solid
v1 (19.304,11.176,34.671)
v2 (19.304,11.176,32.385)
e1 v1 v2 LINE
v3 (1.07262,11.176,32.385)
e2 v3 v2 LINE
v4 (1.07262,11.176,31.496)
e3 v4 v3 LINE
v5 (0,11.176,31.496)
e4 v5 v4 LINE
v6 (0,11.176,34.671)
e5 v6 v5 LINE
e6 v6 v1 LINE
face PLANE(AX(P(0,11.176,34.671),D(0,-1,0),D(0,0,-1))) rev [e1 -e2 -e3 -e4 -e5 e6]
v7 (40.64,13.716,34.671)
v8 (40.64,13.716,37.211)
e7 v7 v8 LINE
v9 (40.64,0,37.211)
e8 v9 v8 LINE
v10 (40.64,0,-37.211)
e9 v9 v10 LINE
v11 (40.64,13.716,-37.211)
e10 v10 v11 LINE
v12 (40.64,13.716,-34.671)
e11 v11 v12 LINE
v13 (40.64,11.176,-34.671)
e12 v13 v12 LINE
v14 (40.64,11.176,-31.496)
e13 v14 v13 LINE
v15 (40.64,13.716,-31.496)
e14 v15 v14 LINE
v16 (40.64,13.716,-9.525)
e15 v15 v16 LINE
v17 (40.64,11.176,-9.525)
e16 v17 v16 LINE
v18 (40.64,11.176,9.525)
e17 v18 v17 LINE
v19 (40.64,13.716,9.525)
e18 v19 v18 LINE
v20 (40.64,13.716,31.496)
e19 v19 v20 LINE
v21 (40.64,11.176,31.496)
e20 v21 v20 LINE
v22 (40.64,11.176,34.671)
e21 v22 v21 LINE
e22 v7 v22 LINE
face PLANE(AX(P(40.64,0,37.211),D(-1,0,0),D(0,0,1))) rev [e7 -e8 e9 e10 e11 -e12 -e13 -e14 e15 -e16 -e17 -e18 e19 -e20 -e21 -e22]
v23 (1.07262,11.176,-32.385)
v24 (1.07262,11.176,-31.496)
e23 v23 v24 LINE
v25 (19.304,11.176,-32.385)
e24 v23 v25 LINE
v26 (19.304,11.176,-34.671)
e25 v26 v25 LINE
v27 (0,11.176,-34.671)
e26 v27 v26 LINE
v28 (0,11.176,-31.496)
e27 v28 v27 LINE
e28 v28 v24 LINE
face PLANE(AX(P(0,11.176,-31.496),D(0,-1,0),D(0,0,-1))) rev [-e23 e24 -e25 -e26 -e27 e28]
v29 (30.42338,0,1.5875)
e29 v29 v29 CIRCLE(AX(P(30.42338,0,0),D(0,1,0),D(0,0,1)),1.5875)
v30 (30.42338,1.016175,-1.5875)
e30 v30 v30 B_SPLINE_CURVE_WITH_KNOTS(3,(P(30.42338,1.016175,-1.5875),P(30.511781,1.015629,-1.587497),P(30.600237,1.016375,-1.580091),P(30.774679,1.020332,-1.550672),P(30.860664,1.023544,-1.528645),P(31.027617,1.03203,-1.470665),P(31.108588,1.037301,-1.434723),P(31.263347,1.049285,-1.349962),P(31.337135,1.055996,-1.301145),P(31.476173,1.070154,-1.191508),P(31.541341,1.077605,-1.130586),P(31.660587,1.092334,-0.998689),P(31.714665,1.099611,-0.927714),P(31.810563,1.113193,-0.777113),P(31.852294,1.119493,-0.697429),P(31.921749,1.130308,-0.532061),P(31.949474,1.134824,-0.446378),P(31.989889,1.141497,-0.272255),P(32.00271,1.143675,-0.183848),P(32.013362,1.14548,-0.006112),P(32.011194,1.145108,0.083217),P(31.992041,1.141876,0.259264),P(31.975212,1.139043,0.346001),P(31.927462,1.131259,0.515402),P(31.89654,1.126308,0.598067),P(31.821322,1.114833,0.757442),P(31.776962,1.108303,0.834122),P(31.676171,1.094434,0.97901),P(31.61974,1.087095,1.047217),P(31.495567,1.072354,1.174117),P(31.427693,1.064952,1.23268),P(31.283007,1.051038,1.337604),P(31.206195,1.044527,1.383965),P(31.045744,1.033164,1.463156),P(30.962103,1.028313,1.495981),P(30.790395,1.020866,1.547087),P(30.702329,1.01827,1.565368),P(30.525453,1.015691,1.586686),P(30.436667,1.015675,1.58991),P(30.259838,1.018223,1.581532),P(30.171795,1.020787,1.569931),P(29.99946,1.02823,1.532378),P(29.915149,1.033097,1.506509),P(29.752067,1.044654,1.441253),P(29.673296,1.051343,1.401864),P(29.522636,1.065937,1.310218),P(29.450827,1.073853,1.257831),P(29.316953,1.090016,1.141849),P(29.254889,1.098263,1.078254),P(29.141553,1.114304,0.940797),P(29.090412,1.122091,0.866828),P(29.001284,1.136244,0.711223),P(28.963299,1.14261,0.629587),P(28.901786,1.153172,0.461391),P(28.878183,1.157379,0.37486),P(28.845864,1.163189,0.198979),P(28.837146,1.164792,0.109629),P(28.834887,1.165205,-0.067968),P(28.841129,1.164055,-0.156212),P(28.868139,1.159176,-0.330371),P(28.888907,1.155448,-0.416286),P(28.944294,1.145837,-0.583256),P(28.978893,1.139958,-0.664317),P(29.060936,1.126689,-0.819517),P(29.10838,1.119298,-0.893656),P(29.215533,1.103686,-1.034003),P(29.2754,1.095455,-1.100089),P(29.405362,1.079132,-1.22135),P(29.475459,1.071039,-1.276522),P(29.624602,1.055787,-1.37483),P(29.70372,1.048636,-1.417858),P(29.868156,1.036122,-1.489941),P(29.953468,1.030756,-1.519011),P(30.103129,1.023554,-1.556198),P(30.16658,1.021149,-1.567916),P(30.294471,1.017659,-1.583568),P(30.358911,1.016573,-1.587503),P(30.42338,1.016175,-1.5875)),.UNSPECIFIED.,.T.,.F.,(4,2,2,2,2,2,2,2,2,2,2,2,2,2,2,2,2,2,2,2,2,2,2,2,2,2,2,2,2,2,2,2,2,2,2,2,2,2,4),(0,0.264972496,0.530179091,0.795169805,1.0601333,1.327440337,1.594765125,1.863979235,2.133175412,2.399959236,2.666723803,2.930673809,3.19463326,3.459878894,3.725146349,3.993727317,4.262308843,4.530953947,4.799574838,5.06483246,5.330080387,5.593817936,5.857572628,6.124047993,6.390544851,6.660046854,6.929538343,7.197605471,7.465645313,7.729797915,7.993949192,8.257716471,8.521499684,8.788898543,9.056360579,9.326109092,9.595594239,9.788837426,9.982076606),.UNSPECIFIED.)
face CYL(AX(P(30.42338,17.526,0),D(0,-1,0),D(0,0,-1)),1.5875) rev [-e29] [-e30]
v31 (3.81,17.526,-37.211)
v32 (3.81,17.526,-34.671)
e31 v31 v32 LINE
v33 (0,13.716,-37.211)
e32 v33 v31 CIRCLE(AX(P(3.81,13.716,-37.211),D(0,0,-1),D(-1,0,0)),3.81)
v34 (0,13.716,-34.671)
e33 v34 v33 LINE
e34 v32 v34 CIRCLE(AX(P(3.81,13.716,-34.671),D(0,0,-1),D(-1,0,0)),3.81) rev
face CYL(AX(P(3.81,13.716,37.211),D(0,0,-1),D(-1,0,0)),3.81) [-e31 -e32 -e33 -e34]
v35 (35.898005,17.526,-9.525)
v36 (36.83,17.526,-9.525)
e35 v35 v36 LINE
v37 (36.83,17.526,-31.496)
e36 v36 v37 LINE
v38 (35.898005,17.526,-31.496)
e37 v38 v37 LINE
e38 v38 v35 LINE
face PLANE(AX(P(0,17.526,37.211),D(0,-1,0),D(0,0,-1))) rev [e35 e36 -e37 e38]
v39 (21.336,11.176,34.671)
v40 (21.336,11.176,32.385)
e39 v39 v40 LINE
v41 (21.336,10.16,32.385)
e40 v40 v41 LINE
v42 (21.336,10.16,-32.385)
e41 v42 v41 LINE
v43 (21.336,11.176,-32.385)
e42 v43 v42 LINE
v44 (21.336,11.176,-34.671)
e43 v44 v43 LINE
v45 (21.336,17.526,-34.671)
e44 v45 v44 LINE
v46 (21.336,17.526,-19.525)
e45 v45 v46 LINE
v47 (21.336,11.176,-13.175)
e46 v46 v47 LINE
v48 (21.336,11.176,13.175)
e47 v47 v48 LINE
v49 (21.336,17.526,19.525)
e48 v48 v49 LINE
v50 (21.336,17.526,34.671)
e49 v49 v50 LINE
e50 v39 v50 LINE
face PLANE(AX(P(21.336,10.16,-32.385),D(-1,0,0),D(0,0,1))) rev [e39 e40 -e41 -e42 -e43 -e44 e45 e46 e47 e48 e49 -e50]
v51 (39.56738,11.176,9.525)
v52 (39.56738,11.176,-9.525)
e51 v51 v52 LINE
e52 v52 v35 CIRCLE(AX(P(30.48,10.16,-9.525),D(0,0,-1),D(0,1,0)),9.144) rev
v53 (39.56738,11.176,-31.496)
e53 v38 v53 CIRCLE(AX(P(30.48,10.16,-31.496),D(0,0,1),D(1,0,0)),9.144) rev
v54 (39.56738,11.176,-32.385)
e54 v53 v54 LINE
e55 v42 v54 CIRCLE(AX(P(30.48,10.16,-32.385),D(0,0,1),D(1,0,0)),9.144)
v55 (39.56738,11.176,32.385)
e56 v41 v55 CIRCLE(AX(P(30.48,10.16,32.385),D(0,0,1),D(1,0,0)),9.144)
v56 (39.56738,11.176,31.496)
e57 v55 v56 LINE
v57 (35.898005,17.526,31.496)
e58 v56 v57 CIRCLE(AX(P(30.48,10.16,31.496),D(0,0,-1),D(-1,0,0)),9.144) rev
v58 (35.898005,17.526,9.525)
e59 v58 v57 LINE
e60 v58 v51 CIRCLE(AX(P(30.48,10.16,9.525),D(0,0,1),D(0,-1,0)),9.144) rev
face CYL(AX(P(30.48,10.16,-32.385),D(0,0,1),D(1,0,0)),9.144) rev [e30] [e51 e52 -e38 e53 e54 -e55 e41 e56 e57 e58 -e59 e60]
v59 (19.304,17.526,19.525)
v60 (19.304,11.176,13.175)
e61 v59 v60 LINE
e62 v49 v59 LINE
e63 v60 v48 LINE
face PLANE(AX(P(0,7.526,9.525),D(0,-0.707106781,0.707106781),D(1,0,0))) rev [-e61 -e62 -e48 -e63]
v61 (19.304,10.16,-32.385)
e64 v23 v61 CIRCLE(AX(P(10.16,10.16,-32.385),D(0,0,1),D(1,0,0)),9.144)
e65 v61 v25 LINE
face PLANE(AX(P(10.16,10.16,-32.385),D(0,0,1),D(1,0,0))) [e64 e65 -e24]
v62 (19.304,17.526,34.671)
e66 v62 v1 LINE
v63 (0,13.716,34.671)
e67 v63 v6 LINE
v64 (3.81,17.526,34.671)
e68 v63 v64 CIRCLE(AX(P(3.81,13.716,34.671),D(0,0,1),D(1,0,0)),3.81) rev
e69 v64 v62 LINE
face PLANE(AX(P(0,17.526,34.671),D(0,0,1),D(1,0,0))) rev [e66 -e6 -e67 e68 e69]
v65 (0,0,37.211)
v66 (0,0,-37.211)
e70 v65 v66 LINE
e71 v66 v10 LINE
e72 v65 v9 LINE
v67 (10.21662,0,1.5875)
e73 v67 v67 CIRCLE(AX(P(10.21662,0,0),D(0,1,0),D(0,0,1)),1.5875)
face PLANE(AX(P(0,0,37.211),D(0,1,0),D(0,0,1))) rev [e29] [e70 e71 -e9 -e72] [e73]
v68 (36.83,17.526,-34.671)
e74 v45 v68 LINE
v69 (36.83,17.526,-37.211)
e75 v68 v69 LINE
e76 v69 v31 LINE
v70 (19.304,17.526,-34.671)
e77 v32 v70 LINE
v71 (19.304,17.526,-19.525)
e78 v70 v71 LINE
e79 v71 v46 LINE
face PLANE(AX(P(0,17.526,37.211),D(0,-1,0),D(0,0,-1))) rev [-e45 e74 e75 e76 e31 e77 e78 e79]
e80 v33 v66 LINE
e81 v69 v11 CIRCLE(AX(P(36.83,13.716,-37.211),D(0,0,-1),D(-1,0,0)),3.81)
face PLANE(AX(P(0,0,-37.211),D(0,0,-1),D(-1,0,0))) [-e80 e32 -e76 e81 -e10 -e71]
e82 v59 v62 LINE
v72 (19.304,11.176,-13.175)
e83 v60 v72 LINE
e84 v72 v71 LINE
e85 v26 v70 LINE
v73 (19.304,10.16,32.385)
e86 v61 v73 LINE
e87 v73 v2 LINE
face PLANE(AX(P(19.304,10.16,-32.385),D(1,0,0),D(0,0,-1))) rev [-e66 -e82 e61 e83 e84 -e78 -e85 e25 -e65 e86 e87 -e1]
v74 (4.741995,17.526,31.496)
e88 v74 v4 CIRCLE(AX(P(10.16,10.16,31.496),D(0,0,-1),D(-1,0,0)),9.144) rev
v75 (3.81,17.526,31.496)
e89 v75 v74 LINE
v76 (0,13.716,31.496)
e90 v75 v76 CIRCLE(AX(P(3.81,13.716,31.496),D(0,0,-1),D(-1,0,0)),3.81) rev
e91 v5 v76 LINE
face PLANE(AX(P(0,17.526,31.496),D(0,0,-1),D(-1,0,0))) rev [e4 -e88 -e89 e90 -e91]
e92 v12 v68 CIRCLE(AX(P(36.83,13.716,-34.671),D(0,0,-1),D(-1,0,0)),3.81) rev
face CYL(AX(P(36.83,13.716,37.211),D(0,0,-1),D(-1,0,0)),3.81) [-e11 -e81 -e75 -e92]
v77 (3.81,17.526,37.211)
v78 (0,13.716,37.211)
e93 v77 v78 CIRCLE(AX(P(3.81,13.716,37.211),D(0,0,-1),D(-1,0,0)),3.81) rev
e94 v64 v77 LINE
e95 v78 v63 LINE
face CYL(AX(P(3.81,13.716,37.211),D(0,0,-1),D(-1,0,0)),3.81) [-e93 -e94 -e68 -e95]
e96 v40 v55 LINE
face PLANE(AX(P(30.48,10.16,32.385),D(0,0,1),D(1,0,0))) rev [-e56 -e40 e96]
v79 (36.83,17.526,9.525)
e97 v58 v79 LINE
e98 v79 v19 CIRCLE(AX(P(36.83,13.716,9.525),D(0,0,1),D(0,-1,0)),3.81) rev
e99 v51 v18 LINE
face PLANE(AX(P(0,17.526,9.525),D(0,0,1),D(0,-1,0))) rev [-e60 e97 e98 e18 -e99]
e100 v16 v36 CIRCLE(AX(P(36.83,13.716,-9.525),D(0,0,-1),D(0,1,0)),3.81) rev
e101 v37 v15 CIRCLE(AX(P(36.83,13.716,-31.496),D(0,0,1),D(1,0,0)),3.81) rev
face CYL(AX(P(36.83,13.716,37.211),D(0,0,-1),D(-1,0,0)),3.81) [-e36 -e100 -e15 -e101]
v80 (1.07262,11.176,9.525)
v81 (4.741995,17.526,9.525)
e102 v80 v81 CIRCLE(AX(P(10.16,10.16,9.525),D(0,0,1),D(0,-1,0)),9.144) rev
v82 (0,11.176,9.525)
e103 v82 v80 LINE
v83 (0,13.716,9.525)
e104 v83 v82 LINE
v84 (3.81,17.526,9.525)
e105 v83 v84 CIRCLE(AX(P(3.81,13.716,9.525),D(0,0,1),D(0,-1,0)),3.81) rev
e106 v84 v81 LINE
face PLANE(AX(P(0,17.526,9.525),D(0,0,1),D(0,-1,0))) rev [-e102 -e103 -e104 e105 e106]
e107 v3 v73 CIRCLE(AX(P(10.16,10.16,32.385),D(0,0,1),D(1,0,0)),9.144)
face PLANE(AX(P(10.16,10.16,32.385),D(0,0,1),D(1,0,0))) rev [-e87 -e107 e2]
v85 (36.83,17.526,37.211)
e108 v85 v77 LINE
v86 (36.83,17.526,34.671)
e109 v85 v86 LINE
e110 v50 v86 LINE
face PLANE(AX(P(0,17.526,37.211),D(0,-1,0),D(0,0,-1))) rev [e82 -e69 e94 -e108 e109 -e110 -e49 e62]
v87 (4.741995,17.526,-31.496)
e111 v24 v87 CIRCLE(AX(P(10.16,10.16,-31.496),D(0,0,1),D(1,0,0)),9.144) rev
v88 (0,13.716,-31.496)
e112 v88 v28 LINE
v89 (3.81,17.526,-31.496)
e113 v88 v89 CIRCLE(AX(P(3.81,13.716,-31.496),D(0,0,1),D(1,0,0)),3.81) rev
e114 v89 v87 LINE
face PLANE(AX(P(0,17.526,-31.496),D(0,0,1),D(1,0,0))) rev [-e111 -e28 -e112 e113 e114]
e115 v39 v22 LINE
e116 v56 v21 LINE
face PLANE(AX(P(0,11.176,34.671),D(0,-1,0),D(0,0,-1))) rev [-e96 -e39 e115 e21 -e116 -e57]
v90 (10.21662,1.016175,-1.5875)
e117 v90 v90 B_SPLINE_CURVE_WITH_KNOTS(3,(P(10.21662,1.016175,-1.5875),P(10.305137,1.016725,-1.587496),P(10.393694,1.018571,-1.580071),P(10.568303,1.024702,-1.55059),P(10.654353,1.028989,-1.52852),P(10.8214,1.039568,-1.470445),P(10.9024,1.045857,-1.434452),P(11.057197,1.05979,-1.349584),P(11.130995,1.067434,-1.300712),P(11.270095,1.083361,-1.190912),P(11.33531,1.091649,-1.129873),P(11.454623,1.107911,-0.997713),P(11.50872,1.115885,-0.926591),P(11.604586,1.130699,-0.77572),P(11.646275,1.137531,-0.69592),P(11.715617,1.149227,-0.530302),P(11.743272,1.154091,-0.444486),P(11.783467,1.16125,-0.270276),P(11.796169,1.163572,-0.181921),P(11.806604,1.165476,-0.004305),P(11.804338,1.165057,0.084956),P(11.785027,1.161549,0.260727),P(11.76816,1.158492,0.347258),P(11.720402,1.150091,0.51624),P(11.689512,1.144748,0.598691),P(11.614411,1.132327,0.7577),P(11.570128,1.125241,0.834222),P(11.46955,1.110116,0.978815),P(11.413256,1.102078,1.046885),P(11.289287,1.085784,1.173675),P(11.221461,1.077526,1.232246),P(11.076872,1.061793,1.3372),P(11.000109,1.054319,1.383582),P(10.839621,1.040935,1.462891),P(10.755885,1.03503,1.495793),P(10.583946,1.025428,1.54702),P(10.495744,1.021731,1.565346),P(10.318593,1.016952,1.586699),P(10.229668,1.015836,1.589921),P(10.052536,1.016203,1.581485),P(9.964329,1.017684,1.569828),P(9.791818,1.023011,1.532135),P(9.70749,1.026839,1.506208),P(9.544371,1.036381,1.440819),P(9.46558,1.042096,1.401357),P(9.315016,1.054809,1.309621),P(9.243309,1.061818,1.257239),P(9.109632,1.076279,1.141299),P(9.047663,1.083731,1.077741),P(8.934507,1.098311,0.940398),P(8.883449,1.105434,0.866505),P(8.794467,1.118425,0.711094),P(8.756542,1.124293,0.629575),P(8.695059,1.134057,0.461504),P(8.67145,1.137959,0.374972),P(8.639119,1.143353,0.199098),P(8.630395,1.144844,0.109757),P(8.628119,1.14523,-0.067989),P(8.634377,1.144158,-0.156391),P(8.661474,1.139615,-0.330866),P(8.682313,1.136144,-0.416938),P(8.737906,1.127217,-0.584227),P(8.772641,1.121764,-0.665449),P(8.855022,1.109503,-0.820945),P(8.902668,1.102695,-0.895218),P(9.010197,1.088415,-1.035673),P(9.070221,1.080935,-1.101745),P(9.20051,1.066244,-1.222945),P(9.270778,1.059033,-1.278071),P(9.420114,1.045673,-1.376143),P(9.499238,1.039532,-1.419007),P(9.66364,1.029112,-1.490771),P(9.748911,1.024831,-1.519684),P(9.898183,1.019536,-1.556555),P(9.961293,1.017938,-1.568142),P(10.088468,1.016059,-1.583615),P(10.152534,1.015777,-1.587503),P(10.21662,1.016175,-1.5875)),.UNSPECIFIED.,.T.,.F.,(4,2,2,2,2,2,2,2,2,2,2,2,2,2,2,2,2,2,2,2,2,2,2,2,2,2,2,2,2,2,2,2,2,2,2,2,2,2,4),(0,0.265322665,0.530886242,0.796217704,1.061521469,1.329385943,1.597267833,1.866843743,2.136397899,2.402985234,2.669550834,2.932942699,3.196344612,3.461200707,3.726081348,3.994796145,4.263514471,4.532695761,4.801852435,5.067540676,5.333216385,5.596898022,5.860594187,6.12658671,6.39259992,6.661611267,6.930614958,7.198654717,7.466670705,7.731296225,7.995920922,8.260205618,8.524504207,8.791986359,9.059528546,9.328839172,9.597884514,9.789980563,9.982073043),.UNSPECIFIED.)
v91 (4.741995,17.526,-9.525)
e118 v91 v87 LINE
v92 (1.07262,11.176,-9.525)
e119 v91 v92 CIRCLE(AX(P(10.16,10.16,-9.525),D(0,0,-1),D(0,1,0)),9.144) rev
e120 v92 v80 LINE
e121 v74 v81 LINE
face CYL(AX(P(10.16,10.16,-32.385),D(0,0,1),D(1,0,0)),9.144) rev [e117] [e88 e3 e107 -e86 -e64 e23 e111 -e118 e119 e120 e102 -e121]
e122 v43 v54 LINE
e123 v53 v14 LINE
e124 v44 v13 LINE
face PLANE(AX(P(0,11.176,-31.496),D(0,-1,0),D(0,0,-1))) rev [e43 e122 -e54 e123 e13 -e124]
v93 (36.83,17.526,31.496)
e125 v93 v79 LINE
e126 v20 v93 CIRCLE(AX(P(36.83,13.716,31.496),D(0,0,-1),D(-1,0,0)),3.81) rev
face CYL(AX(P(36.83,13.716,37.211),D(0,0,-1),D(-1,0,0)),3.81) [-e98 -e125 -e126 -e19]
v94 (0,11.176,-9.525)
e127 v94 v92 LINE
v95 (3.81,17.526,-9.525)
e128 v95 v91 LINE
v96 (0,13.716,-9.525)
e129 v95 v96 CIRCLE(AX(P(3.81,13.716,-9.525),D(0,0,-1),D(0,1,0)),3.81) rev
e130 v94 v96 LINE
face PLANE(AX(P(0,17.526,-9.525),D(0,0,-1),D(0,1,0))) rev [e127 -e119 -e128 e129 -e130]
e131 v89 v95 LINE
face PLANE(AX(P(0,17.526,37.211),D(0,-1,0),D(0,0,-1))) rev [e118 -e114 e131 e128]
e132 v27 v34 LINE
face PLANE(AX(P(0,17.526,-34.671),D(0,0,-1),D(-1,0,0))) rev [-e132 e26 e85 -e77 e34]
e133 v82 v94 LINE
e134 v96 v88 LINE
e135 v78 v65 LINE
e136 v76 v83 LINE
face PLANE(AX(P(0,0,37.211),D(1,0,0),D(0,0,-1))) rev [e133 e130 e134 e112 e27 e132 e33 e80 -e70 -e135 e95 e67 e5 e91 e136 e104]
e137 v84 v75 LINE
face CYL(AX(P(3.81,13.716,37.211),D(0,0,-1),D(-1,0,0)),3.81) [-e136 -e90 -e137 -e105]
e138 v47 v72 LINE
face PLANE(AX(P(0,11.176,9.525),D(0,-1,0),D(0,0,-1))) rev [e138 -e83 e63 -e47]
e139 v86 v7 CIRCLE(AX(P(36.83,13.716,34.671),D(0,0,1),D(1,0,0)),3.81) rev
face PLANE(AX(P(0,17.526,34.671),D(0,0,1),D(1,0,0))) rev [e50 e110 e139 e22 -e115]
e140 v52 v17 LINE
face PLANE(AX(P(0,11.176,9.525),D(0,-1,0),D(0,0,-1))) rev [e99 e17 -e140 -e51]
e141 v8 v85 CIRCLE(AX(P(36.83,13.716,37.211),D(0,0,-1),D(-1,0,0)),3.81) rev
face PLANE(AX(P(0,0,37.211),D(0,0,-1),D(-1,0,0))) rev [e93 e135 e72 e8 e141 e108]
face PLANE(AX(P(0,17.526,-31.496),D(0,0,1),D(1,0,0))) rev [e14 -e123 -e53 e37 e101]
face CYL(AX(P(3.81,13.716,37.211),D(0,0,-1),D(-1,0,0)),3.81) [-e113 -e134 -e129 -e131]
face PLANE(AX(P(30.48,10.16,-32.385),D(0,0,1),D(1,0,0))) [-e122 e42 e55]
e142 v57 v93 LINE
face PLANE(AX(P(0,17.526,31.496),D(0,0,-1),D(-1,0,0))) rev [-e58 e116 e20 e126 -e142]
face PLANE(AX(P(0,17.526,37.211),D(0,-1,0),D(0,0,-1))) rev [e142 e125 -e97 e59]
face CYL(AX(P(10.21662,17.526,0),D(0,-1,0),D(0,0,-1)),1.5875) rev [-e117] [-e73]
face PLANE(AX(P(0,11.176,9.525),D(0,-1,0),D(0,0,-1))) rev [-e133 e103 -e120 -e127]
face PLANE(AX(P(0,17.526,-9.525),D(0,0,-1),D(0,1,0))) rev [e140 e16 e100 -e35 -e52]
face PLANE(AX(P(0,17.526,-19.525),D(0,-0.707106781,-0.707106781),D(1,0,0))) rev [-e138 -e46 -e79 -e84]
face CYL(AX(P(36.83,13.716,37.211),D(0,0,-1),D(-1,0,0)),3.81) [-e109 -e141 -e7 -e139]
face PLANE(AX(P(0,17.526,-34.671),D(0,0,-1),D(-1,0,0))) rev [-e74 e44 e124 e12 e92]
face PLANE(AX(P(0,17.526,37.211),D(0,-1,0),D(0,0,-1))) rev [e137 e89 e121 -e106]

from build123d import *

# Parameters (mm, degrees)
SKETCH1_W               = 40.64
SKETCH1_H               = 17.526
BOSS_EXTRUDE1_DEPTH     = 37.211
CUT_EXTRUDE1_DEPTH      = 32.385
FILLET1_R               = 3.81
SKETCH3_W               = 3.175
SKETCH3_H               = 6.35
SKETCH3_W_2             = 19.05
CUT_EXTRUDE2_DEPTH      = 58.822390101
CHAMFER1_SIZE           = 10
CUT_EXTRUDE7_DEPTH      = 58.822390101
CUT_EXTRUDE7_DEPTH_BACK = 58.822390101
SKETCH5_R               = 1.5875
BOSS_EXTRUDE2_REACH     = 83.728
SKETCH6_W               = 2.032
SKETCH6_H               = 6.35
BOSS_EXTRUDE3_REACH     = 83.728
SKETCH7_W               = 2.032
SKETCH7_H               = 6.35


with BuildPart() as part:
    # Sketch1 → Boss-Extrude1 (new, symmetric)
    with BuildSketch(Plane.XY):
        with Locations((20.32, 8.763)):
            Rectangle(SKETCH1_W, SKETCH1_H)
    extrude(amount=BOSS_EXTRUDE1_DEPTH, both=True)

    # Sketch2 → Cut-Extrude1 (cut, symmetric)
    with BuildSketch(Plane.XY):
        with BuildLine():
            Line((19.304, 10.16), (19.304, 17.526))
            Line((19.304, 17.526), (15.578005168, 17.526))
            ThreePointArc((15.578005168, 17.526), (2.000497097, 6.032622095), (19.304, 10.16))
        make_face()
        with BuildLine():
            Line((21.336, 10.16), (21.336, 17.526))
            Line((21.336, 17.526), (25.061994832, 17.526))
            ThreePointArc((25.061994832, 17.526), (38.639502903, 6.032622095), (21.336, 10.16))
        make_face()
    extrude(amount=CUT_EXTRUDE1_DEPTH, both=True, mode=Mode.SUBTRACT)

    # Fillet1
    fillet1_edges = [part.edges().sort_by_distance(p)[0] for p in [
        (0, 17.526, 0),
        (40.64, 17.526, 0),
    ]]
    fillet(fillet1_edges, radius=FILLET1_R)

    # Sketch3 → Cut-Extrude2 (cut, through all)
    with BuildSketch(Plane(origin=(40.64, 0, 0), x_dir=(0, 0, -1), z_dir=(1, 0, 0))):
        with Locations((-33.0835, 14.351)):
            Rectangle(SKETCH3_W, SKETCH3_H)
        with Locations((0, 14.351)):
            Rectangle(SKETCH3_W_2, SKETCH3_H)
        with Locations((33.0835, 14.351)):
            Rectangle(SKETCH3_W, SKETCH3_H)
    extrude(amount=-CUT_EXTRUDE2_DEPTH, mode=Mode.SUBTRACT)

    # Chamfer1
    # the kernel refuses this chamfer: 10 mm, written as the material it takes off along each edge
    with BuildSketch(Plane(origin=(21.336, 17.526, -9.525), x_dir=(0, -0.9996219169112968, 0.027495876610586664), z_dir=(-1, 0, 0))) as chamfer1_piece_1_section:
        Polygon((CHAMFER1_SIZE * 0.999621916911, -CHAMFER1_SIZE * 0.0274958766106), (-CHAMFER1_SIZE * 0.0274958766106, -CHAMFER1_SIZE * 0.999621916911), (0, 0), align=None)
    chamfer1_piece_1 = extrude(amount=2.032, mode=Mode.PRIVATE)
    chamfer1_piece_1 = split(chamfer1_piece_1, bisect_by=Plane(origin=(20.32, 11.176, -13.183669109), z_dir=(0, 1, 0)), keep=Keep.TOP, mode=Mode.PRIVATE)
    add(chamfer1_piece_1, mode=Mode.SUBTRACT)
    with BuildSketch(Plane(origin=(21.336, 17.526, 9.525), x_dir=(0, 0.027495876610586324, 0.9996219169112968), z_dir=(-1, 0, 0))) as chamfer1_piece_2_section:
        Polygon((CHAMFER1_SIZE * 0.999621916911, -CHAMFER1_SIZE * 0.0274958766106), (-CHAMFER1_SIZE * 0.0274958766106, -CHAMFER1_SIZE * 0.999621916911), (0, 0), align=None)
    chamfer1_piece_2 = extrude(amount=2.032, mode=Mode.PRIVATE)
    chamfer1_piece_2 = split(chamfer1_piece_2, bisect_by=Plane(origin=(20.32, 11.176, 13.183669109), z_dir=(0, 1, 0)), keep=Keep.TOP, mode=Mode.PRIVATE)
    add(chamfer1_piece_2, mode=Mode.SUBTRACT)

    # Sketch5 → Cut-Extrude7 (cut, two sides: drawn at the far end of the back side and taken through both)
    with BuildSketch(Plane.XZ.offset(-CUT_EXTRUDE7_DEPTH_BACK)):
        with Locations(Location((30.423380261, 0, 0), (0, 0, 270))):
            Circle(SKETCH5_R)
        with Locations(Location((10.216619739, 0, 0), (0, 0, 270))):
            Circle(SKETCH5_R)
    extrude(amount=CUT_EXTRUDE7_DEPTH + CUT_EXTRUDE7_DEPTH_BACK, mode=Mode.SUBTRACT)

    # Sketch6 → Boss-Extrude2 (add, up to next)
    with BuildSketch(Plane(origin=(0, 0, -31.496), x_dir=(-1, 0, 0), z_dir=(0, 0, -1)), mode=Mode.PRIVATE) as boss_extrude2_sk1:
        with Locations((-20.32, 14.351)):
            Rectangle(SKETCH6_W, SKETCH6_H)
    boss_extrude2_tool1 = extrude(boss_extrude2_sk1.sketch, amount=BOSS_EXTRUDE2_REACH, mode=Mode.PRIVATE) - part.part
    add(boss_extrude2_tool1.solids().sort_by_distance((20.32, 14.351, -31.496))[0])

    # Sketch7 → Boss-Extrude3 (add, up to next)
    with BuildSketch(Plane.XY.offset(31.496), mode=Mode.PRIVATE) as boss_extrude3_sk1:
        with Locations((20.32, 14.351)):
            Rectangle(SKETCH7_W, SKETCH7_H)
    boss_extrude3_tool1 = extrude(boss_extrude3_sk1.sketch, amount=BOSS_EXTRUDE3_REACH, mode=Mode.PRIVATE) - part.part
    add(boss_extrude3_tool1.solids().sort_by_distance((20.32, 14.351, 31.496))[0])


solid = part.part
